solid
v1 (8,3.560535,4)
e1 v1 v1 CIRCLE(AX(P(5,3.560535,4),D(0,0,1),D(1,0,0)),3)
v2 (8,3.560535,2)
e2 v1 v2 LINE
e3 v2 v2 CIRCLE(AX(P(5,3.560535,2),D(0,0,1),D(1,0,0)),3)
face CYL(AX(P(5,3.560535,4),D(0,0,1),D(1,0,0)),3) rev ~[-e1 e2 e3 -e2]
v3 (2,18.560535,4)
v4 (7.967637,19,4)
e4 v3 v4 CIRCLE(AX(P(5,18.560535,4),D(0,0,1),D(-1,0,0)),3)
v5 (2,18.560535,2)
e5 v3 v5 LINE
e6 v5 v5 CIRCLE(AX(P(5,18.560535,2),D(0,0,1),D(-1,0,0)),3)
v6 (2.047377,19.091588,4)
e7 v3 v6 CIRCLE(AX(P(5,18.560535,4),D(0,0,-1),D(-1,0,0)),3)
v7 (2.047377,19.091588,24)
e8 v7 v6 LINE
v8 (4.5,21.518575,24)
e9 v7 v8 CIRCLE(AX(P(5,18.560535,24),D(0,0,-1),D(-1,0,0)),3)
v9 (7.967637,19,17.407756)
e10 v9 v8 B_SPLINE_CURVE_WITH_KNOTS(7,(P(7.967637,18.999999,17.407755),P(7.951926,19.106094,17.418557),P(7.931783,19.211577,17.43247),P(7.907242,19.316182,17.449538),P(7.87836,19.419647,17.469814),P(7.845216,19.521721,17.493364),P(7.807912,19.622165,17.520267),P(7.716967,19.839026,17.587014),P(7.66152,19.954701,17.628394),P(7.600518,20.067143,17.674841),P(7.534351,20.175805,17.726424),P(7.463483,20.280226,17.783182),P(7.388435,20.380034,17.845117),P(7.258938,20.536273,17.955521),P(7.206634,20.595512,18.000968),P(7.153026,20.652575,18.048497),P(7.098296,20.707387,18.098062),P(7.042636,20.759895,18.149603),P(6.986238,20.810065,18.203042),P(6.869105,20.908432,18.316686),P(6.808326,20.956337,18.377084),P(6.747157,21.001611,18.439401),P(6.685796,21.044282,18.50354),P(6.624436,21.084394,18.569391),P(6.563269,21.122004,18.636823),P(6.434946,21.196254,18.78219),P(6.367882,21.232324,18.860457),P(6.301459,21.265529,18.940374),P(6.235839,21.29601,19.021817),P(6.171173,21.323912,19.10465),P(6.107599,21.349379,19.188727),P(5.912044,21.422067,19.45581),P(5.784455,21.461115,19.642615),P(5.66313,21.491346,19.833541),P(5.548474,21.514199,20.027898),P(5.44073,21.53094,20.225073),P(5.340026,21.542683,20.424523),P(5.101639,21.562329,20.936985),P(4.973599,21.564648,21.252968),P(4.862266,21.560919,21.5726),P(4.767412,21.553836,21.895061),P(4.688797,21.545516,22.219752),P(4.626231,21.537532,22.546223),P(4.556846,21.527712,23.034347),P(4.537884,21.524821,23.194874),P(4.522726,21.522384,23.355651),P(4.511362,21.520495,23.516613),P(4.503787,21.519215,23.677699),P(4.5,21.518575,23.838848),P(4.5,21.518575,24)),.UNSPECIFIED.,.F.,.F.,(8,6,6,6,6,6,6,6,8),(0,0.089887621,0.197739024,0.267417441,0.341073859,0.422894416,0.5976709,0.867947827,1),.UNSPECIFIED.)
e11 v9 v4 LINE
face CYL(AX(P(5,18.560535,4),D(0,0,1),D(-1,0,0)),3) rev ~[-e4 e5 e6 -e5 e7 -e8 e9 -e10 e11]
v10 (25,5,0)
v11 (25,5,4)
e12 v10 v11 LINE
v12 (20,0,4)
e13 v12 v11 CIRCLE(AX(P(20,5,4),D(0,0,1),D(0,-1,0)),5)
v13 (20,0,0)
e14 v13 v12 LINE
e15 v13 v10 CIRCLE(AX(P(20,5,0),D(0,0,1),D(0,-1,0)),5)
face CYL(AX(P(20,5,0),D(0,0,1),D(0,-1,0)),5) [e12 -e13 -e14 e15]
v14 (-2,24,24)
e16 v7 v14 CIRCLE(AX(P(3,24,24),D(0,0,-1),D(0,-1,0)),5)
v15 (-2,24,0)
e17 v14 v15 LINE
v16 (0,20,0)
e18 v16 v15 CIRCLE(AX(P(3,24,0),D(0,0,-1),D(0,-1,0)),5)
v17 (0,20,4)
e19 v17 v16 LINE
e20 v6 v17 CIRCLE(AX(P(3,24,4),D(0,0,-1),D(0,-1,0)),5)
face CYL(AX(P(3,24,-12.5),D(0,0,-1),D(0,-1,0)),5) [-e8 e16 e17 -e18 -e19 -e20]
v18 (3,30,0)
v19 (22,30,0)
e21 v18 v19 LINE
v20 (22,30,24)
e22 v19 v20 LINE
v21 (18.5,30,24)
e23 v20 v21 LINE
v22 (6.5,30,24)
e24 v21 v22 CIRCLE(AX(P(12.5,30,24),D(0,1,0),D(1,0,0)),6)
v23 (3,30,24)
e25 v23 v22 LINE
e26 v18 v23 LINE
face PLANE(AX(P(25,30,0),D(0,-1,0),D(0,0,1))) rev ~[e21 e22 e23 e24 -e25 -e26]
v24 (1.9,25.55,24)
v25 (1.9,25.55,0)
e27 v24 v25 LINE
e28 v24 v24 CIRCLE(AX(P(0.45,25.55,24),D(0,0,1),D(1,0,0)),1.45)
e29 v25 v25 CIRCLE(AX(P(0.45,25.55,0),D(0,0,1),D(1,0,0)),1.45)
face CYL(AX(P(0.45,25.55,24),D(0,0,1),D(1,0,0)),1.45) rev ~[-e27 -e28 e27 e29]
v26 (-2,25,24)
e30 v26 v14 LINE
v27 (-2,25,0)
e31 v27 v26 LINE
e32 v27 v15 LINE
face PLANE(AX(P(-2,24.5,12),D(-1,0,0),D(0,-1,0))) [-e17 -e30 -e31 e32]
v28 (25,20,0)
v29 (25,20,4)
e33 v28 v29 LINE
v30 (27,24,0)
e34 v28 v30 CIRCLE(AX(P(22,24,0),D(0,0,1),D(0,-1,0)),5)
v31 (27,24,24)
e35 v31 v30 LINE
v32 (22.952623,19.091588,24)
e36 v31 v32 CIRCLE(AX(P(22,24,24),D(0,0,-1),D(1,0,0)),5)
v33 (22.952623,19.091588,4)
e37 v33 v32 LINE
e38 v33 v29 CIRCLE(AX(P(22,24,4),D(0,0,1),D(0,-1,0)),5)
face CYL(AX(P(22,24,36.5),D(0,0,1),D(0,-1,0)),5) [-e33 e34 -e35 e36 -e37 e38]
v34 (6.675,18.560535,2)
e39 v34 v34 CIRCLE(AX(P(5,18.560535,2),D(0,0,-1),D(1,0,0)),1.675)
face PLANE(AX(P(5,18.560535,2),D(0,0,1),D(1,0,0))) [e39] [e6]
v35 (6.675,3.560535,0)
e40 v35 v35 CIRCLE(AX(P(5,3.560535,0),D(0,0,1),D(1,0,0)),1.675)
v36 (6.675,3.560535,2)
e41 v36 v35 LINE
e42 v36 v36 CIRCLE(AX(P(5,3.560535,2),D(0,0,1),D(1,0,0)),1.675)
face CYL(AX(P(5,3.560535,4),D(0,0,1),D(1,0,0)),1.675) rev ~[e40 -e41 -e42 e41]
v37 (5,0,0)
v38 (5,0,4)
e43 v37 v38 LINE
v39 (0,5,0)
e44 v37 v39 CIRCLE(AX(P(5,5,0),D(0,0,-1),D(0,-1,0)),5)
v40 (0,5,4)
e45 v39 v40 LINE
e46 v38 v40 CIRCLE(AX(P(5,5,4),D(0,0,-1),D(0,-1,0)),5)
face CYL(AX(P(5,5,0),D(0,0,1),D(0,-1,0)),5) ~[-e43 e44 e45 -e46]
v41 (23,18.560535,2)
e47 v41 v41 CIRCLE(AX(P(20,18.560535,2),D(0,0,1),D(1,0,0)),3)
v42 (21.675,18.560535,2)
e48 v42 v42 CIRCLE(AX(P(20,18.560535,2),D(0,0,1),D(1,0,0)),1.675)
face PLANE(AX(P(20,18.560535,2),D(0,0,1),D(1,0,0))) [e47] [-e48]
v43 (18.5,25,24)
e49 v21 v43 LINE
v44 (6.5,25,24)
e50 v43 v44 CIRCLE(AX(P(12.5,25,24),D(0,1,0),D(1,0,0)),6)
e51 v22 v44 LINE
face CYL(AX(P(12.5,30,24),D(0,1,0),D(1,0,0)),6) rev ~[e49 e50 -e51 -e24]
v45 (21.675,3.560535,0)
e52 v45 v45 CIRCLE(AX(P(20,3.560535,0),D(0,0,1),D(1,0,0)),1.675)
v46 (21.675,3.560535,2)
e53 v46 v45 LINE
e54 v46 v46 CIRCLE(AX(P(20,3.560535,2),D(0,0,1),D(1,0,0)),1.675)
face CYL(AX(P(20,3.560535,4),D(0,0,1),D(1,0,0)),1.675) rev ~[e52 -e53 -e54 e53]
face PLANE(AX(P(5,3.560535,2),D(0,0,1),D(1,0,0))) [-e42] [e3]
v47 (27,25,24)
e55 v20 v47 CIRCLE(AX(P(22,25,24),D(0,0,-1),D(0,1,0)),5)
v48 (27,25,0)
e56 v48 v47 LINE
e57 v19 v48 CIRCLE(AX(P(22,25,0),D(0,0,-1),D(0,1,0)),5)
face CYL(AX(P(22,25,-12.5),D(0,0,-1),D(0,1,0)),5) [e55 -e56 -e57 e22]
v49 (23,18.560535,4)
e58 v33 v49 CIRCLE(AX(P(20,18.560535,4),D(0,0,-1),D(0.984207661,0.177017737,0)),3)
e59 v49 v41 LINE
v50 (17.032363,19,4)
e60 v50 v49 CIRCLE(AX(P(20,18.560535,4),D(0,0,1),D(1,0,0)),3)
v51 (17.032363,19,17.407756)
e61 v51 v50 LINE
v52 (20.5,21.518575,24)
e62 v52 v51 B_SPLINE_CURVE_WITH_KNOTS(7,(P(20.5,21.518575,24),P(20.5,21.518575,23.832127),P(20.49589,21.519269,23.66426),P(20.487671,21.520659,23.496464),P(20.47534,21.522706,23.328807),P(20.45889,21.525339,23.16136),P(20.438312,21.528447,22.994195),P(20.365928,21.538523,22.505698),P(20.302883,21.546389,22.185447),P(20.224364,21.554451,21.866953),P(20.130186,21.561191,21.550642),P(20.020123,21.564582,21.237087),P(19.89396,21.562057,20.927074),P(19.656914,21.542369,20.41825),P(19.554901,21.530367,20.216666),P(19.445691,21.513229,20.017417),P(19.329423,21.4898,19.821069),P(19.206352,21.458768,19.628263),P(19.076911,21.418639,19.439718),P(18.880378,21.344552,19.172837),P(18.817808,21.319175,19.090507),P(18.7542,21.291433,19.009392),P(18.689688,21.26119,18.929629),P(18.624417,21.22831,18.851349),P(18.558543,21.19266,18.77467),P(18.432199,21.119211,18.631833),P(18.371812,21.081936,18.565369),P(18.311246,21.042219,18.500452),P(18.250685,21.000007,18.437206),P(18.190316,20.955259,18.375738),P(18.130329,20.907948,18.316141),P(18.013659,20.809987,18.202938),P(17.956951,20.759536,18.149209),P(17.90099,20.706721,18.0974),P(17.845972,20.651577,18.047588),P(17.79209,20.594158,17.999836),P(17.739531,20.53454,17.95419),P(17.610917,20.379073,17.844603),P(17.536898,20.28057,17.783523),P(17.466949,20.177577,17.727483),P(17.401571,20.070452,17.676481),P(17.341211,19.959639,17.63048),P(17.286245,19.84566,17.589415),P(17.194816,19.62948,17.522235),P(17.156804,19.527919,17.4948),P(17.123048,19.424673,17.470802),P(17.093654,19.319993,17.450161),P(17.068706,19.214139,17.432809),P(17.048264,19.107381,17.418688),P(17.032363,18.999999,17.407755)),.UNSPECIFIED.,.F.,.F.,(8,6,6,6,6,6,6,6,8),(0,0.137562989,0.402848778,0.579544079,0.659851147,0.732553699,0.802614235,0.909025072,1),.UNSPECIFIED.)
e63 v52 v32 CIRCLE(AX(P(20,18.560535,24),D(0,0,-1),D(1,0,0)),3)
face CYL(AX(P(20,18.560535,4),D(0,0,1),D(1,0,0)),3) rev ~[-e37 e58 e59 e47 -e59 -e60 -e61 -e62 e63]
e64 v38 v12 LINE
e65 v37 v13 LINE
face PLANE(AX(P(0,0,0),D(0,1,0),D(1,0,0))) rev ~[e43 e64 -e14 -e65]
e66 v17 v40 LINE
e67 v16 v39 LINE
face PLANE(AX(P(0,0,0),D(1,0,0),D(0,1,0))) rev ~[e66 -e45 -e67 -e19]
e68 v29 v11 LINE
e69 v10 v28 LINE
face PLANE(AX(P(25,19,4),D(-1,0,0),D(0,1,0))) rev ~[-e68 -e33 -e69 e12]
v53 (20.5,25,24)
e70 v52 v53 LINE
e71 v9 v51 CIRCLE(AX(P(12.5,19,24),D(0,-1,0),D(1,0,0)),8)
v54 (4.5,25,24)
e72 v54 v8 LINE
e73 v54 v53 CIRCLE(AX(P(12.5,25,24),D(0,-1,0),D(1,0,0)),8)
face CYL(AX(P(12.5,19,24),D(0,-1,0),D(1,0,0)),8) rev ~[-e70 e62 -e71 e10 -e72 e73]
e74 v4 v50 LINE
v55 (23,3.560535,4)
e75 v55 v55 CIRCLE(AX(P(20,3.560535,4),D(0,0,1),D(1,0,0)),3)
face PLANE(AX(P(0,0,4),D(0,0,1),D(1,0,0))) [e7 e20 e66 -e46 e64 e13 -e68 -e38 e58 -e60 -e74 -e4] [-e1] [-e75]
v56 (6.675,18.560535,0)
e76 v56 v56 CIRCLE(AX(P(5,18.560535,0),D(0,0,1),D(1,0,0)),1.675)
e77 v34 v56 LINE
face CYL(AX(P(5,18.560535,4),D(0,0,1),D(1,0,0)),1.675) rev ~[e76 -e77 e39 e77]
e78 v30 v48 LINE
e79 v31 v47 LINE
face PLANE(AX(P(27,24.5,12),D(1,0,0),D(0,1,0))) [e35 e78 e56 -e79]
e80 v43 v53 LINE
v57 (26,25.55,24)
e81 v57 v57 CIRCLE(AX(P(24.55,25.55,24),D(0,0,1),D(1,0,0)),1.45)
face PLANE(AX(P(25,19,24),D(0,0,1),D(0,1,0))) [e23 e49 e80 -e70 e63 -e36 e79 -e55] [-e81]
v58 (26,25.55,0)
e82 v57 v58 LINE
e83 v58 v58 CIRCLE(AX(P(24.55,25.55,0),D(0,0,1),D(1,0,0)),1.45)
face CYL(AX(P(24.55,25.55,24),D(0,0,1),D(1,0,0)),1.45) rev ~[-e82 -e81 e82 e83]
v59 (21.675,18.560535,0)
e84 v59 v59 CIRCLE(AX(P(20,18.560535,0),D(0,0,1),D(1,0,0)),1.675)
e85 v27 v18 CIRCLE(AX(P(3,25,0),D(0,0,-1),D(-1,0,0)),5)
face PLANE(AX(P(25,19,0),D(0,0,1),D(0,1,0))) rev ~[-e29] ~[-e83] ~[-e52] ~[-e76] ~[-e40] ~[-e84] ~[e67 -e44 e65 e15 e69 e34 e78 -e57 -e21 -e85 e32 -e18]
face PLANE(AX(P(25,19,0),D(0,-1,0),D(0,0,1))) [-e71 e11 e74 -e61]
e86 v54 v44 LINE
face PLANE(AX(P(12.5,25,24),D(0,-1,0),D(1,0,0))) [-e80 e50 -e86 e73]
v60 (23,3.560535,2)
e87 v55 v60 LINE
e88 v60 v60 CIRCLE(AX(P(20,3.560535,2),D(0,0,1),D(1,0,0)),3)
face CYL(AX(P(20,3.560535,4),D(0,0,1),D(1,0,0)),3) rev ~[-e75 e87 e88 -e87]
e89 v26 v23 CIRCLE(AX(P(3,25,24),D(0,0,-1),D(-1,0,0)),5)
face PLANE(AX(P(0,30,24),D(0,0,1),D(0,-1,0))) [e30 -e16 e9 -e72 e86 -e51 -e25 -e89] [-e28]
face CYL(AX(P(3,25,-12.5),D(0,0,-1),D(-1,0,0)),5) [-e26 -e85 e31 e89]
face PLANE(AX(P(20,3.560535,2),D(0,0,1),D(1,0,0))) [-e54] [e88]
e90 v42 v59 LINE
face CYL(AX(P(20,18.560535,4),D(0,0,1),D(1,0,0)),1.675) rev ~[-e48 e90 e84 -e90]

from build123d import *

# Parameters (mm, degrees)
F0_W          = 25
F0_H          = 30
F1_DEPTH      = 4
F2_R          = 1.675
F3_DEPTH      = 25
F4_W          = 25
F4_H          = 11
F5_DEPTH      = 20
F7_DEPTH      = 6
F8_R          = 8
F9_DEPTH      = 6
F2_R_2        = 3
F10_DEPTH     = 2
F11_W         = 11
F11_H         = 24
F12_DEPTH     = 2
F13_R         = 5
F14_W         = 11
F14_H         = 24
F15_DEPTH     = 2
F16_DEPTH     = 2
F17_R         = 1.45
F18_DEPTH     = 25
F19_T1_DEPTH  = 49
F19_T6_DEPTH  = 49
F19_T11_DEPTH = 49
F19_T16_DEPTH = 49
F19_T21_DEPTH = 49
F20_DEPTH     = 25


# Not quite as in the source:
# - a fillet or chamfer that OpenCascade refuses, or shapes differently, is made with other operations: its cross-section is extruded or revolved along the edge and cut away or added


with BuildPart() as f1:
    # F0 (on Top) → F1 (new body)
    with BuildSketch(Plane.XY):
        with Locations((12.5, 15)):
            Rectangle(F0_W, F0_H)
    extrude(amount=F1_DEPTH)

    # F2 (on face) → F3 (cut)
    with BuildSketch(Plane.XY.offset(4)):
        with BuildLine():
            ThreePointArc((3.325, 18.5605346784), (5, 16.8855346784), (6.675, 18.5605346784))
            ThreePointArc((6.675, 18.5605346784), (5, 20.2355346784), (3.325, 18.5605346784))
        make_face()
        with Locations((20, 18.5605346784)):
            Circle(F2_R)
        with Locations((20, 3.5605346784)):
            Circle(F2_R)
        with Locations((5, 3.5605346784)):
            Circle(F2_R)
    extrude(amount=-F3_DEPTH, mode=Mode.SUBTRACT)

    # F4 (on face) → F5 (join)
    with BuildSketch(Plane.XY.offset(4)):
        with Locations((12.5, 24.5)):
            Rectangle(F4_W, F4_H)
    extrude(amount=F5_DEPTH)

    # F6 (on face) → F7 (cut)
    with BuildSketch(Plane(origin=(0, 30, 0), x_dir=(-1, 0, 0), z_dir=(0, 1, 0))):
        with BuildLine():
            ThreePointArc((-18.5, 24), (-12.5, 18), (-6.5, 24))
            Line((-6.5, 24), (-18.5, 24))
        make_face()
    extrude(amount=-F7_DEPTH, mode=Mode.SUBTRACT)

    # F8 (on face) → F9 (cut)
    with BuildSketch(Plane.XZ.offset(-19)):
        with Locations((12.5, 24)):
            Circle(F8_R)
    extrude(amount=-F9_DEPTH, mode=Mode.SUBTRACT)

    # F2 (on face) → F10 (cut)
    with BuildSketch(Plane.XY.offset(4)):
        with BuildLine():
            ThreePointArc((8, 18.5605346784), (5, 21.5605346784), (2, 18.5605346784))
            ThreePointArc((2, 18.5605346784), (5, 15.5605346784), (8, 18.5605346784))
        make_face()
        with BuildLine():
            ThreePointArc((3.325, 18.5605346784), (5, 20.2355346784), (6.675, 18.5605346784))
            ThreePointArc((6.675, 18.5605346784), (5, 16.8855346784), (3.325, 18.5605346784))
        make_face(mode=Mode.SUBTRACT)
        with Locations((20, 18.5605346784)):
            Circle(F2_R_2)
        with Locations((20, 18.5605346784)):
            Circle(F2_R, mode=Mode.SUBTRACT)
        with Locations((20, 3.5605346784)):
            Circle(F2_R_2)
        with Locations((20, 3.5605346784)):
            Circle(F2_R, mode=Mode.SUBTRACT)
        with Locations((5, 3.5605346784)):
            Circle(F2_R_2)
        with Locations((5, 3.5605346784)):
            Circle(F2_R, mode=Mode.SUBTRACT)
    extrude(amount=-F10_DEPTH, mode=Mode.SUBTRACT)

    # F11 (on face) → F12 (join)
    with BuildSketch(Plane(origin=(0, 0, 0), x_dir=(0, -1, 0), z_dir=(-1, 0, 0))):
        with Locations((-24.5, 12)):
            Rectangle(F11_W, F11_H)
    extrude(amount=F12_DEPTH)

    # F13
    f13_edges = [f1.edges().sort_by_distance(p)[0] for p in [
        (0, 0, 2),
        (25, 0, 2),
    ]]
    fillet(f13_edges, radius=F13_R)

    # F14 (on face) → F15 (join)
    with BuildSketch(Plane.YZ.offset(25)):
        with Locations((24.5, 12)):
            Rectangle(F14_W, F14_H)
    extrude(amount=F15_DEPTH)

    # F14 (on face) → F16 (join)
    with BuildSketch(Plane.YZ.offset(25)):
        with Locations((24.5, 12)):
            Rectangle(F14_W, F14_H)
    extrude(amount=F16_DEPTH)

    # F17 (on face) → F18 (cut)
    with BuildSketch(Plane.XY.offset(24)):
        with Locations((0.45, 25.55)):
            Circle(F17_R)
        with Locations((24.55, 25.55)):
            Circle(F17_R)
    extrude(amount=-F18_DEPTH, mode=Mode.SUBTRACT)

    # F19: fillet of radius 5 on 4 edges, made by hand

    # F19_s2 → F19_t1 (cut)
    with BuildSketch(Plane.XY.offset(-12.5)):
        with BuildLine():
            ThreePointArc((-2, 25), (-0.5355339059, 28.5355339059), (3, 30))
            Line((3, 30), (-2, 30))
            Line((-2, 30), (-2, 25))
        make_face()
        with BuildLine():
            ThreePointArc((22, 30), (25.5355339059, 28.5355339059), (27, 25))
            Line((27, 25), (27, 30))
            Line((27, 30), (22, 30))
        make_face()
    extrude(amount=F19_T1_DEPTH, mode=Mode.SUBTRACT)


with BuildPart() as f19_tool4:
    # F19_s5 → F19_t6 (new body)
    with BuildSketch(Plane.XY.offset(-12.5)):
        with BuildLine():
            ThreePointArc((3, 19), (-0.5355339059, 20.4644660941), (-2, 24))
            Line((-2, 24), (-2, 19))
            Line((-2, 19), (3, 19))
        make_face()
    extrude(amount=F19_T6_DEPTH)

    split(bisect_by=Plane.YZ, keep=Keep.BOTTOM)


with BuildPart() as f1_1:
    add(f1.part)

    # F19_t3: cut F19_tool4
    add(f19_tool4.part, mode=Mode.SUBTRACT)


with BuildPart() as f19_tool9:
    # F19_s10 → F19_t11 (new body)
    with BuildSketch(Plane.XY.offset(-12.5)):
        with BuildLine():
            ThreePointArc((3, 19), (-0.5355339059, 20.4644660941), (-2, 24))
            Line((-2, 24), (-2, 19))
            Line((-2, 19), (3, 19))
        make_face()
    extrude(amount=F19_T11_DEPTH)

    split(bisect_by=Plane.XY.offset(4), keep=Keep.TOP)


with BuildPart() as f1_2:
    add(f1_1.part)

    # F19_t8: cut F19_tool9
    add(f19_tool9.part, mode=Mode.SUBTRACT)


with BuildPart() as f19_tool14:
    # F19_s15 → F19_t16 (new body)
    with BuildSketch(Plane.XY.offset(36.5)):
        with BuildLine():
            ThreePointArc((22, 19), (25.5355339059, 20.4644660941), (27, 24))
            Line((27, 24), (27, 19))
            Line((27, 19), (22, 19))
        make_face()
    extrude(amount=-F19_T16_DEPTH)

    split(bisect_by=Plane.XY.offset(4), keep=Keep.TOP)


with BuildPart() as f1_3:
    add(f1_2.part)

    # F19_t13: cut F19_tool14
    add(f19_tool14.part, mode=Mode.SUBTRACT)


with BuildPart() as f19_tool19:
    # F19_s20 → F19_t21 (new body)
    with BuildSketch(Plane.XY.offset(36.5)):
        with BuildLine():
            ThreePointArc((22, 19), (25.5355339059, 20.4644660941), (27, 24))
            Line((27, 24), (27, 19))
            Line((27, 19), (22, 19))
        make_face()
    extrude(amount=-F19_T21_DEPTH)

    split(bisect_by=Plane.YZ.offset(25), keep=Keep.TOP)


with BuildPart() as f1_4:
    add(f1_3.part)

    # F19_t18: cut F19_tool19
    add(f19_tool19.part, mode=Mode.SUBTRACT)

    # F2 (on face) → F20 (cut)
    with BuildSketch(Plane.XY.offset(4)):
        with BuildLine():
            ThreePointArc((8, 18.5605346784), (5, 21.5605346784), (2, 18.5605346784))
            ThreePointArc((2, 18.5605346784), (5, 15.5605346784), (8, 18.5605346784))
        make_face()
        with BuildLine():
            ThreePointArc((3.325, 18.5605346784), (5, 20.2355346784), (6.675, 18.5605346784))
            ThreePointArc((6.675, 18.5605346784), (5, 16.8855346784), (3.325, 18.5605346784))
        make_face(mode=Mode.SUBTRACT)
        with Locations((20, 18.5605346784)):
            Circle(F2_R_2)
        with Locations((20, 18.5605346784)):
            Circle(F2_R, mode=Mode.SUBTRACT)
        with BuildLine():
            ThreePointArc((3.325, 18.5605346784), (5, 16.8855346784), (6.675, 18.5605346784))
            ThreePointArc((6.675, 18.5605346784), (5, 20.2355346784), (3.325, 18.5605346784))
        make_face()
        with Locations((20, 18.5605346784)):
            Circle(F2_R)
    extrude(amount=F20_DEPTH, mode=Mode.SUBTRACT)


solid = f1_4.part
